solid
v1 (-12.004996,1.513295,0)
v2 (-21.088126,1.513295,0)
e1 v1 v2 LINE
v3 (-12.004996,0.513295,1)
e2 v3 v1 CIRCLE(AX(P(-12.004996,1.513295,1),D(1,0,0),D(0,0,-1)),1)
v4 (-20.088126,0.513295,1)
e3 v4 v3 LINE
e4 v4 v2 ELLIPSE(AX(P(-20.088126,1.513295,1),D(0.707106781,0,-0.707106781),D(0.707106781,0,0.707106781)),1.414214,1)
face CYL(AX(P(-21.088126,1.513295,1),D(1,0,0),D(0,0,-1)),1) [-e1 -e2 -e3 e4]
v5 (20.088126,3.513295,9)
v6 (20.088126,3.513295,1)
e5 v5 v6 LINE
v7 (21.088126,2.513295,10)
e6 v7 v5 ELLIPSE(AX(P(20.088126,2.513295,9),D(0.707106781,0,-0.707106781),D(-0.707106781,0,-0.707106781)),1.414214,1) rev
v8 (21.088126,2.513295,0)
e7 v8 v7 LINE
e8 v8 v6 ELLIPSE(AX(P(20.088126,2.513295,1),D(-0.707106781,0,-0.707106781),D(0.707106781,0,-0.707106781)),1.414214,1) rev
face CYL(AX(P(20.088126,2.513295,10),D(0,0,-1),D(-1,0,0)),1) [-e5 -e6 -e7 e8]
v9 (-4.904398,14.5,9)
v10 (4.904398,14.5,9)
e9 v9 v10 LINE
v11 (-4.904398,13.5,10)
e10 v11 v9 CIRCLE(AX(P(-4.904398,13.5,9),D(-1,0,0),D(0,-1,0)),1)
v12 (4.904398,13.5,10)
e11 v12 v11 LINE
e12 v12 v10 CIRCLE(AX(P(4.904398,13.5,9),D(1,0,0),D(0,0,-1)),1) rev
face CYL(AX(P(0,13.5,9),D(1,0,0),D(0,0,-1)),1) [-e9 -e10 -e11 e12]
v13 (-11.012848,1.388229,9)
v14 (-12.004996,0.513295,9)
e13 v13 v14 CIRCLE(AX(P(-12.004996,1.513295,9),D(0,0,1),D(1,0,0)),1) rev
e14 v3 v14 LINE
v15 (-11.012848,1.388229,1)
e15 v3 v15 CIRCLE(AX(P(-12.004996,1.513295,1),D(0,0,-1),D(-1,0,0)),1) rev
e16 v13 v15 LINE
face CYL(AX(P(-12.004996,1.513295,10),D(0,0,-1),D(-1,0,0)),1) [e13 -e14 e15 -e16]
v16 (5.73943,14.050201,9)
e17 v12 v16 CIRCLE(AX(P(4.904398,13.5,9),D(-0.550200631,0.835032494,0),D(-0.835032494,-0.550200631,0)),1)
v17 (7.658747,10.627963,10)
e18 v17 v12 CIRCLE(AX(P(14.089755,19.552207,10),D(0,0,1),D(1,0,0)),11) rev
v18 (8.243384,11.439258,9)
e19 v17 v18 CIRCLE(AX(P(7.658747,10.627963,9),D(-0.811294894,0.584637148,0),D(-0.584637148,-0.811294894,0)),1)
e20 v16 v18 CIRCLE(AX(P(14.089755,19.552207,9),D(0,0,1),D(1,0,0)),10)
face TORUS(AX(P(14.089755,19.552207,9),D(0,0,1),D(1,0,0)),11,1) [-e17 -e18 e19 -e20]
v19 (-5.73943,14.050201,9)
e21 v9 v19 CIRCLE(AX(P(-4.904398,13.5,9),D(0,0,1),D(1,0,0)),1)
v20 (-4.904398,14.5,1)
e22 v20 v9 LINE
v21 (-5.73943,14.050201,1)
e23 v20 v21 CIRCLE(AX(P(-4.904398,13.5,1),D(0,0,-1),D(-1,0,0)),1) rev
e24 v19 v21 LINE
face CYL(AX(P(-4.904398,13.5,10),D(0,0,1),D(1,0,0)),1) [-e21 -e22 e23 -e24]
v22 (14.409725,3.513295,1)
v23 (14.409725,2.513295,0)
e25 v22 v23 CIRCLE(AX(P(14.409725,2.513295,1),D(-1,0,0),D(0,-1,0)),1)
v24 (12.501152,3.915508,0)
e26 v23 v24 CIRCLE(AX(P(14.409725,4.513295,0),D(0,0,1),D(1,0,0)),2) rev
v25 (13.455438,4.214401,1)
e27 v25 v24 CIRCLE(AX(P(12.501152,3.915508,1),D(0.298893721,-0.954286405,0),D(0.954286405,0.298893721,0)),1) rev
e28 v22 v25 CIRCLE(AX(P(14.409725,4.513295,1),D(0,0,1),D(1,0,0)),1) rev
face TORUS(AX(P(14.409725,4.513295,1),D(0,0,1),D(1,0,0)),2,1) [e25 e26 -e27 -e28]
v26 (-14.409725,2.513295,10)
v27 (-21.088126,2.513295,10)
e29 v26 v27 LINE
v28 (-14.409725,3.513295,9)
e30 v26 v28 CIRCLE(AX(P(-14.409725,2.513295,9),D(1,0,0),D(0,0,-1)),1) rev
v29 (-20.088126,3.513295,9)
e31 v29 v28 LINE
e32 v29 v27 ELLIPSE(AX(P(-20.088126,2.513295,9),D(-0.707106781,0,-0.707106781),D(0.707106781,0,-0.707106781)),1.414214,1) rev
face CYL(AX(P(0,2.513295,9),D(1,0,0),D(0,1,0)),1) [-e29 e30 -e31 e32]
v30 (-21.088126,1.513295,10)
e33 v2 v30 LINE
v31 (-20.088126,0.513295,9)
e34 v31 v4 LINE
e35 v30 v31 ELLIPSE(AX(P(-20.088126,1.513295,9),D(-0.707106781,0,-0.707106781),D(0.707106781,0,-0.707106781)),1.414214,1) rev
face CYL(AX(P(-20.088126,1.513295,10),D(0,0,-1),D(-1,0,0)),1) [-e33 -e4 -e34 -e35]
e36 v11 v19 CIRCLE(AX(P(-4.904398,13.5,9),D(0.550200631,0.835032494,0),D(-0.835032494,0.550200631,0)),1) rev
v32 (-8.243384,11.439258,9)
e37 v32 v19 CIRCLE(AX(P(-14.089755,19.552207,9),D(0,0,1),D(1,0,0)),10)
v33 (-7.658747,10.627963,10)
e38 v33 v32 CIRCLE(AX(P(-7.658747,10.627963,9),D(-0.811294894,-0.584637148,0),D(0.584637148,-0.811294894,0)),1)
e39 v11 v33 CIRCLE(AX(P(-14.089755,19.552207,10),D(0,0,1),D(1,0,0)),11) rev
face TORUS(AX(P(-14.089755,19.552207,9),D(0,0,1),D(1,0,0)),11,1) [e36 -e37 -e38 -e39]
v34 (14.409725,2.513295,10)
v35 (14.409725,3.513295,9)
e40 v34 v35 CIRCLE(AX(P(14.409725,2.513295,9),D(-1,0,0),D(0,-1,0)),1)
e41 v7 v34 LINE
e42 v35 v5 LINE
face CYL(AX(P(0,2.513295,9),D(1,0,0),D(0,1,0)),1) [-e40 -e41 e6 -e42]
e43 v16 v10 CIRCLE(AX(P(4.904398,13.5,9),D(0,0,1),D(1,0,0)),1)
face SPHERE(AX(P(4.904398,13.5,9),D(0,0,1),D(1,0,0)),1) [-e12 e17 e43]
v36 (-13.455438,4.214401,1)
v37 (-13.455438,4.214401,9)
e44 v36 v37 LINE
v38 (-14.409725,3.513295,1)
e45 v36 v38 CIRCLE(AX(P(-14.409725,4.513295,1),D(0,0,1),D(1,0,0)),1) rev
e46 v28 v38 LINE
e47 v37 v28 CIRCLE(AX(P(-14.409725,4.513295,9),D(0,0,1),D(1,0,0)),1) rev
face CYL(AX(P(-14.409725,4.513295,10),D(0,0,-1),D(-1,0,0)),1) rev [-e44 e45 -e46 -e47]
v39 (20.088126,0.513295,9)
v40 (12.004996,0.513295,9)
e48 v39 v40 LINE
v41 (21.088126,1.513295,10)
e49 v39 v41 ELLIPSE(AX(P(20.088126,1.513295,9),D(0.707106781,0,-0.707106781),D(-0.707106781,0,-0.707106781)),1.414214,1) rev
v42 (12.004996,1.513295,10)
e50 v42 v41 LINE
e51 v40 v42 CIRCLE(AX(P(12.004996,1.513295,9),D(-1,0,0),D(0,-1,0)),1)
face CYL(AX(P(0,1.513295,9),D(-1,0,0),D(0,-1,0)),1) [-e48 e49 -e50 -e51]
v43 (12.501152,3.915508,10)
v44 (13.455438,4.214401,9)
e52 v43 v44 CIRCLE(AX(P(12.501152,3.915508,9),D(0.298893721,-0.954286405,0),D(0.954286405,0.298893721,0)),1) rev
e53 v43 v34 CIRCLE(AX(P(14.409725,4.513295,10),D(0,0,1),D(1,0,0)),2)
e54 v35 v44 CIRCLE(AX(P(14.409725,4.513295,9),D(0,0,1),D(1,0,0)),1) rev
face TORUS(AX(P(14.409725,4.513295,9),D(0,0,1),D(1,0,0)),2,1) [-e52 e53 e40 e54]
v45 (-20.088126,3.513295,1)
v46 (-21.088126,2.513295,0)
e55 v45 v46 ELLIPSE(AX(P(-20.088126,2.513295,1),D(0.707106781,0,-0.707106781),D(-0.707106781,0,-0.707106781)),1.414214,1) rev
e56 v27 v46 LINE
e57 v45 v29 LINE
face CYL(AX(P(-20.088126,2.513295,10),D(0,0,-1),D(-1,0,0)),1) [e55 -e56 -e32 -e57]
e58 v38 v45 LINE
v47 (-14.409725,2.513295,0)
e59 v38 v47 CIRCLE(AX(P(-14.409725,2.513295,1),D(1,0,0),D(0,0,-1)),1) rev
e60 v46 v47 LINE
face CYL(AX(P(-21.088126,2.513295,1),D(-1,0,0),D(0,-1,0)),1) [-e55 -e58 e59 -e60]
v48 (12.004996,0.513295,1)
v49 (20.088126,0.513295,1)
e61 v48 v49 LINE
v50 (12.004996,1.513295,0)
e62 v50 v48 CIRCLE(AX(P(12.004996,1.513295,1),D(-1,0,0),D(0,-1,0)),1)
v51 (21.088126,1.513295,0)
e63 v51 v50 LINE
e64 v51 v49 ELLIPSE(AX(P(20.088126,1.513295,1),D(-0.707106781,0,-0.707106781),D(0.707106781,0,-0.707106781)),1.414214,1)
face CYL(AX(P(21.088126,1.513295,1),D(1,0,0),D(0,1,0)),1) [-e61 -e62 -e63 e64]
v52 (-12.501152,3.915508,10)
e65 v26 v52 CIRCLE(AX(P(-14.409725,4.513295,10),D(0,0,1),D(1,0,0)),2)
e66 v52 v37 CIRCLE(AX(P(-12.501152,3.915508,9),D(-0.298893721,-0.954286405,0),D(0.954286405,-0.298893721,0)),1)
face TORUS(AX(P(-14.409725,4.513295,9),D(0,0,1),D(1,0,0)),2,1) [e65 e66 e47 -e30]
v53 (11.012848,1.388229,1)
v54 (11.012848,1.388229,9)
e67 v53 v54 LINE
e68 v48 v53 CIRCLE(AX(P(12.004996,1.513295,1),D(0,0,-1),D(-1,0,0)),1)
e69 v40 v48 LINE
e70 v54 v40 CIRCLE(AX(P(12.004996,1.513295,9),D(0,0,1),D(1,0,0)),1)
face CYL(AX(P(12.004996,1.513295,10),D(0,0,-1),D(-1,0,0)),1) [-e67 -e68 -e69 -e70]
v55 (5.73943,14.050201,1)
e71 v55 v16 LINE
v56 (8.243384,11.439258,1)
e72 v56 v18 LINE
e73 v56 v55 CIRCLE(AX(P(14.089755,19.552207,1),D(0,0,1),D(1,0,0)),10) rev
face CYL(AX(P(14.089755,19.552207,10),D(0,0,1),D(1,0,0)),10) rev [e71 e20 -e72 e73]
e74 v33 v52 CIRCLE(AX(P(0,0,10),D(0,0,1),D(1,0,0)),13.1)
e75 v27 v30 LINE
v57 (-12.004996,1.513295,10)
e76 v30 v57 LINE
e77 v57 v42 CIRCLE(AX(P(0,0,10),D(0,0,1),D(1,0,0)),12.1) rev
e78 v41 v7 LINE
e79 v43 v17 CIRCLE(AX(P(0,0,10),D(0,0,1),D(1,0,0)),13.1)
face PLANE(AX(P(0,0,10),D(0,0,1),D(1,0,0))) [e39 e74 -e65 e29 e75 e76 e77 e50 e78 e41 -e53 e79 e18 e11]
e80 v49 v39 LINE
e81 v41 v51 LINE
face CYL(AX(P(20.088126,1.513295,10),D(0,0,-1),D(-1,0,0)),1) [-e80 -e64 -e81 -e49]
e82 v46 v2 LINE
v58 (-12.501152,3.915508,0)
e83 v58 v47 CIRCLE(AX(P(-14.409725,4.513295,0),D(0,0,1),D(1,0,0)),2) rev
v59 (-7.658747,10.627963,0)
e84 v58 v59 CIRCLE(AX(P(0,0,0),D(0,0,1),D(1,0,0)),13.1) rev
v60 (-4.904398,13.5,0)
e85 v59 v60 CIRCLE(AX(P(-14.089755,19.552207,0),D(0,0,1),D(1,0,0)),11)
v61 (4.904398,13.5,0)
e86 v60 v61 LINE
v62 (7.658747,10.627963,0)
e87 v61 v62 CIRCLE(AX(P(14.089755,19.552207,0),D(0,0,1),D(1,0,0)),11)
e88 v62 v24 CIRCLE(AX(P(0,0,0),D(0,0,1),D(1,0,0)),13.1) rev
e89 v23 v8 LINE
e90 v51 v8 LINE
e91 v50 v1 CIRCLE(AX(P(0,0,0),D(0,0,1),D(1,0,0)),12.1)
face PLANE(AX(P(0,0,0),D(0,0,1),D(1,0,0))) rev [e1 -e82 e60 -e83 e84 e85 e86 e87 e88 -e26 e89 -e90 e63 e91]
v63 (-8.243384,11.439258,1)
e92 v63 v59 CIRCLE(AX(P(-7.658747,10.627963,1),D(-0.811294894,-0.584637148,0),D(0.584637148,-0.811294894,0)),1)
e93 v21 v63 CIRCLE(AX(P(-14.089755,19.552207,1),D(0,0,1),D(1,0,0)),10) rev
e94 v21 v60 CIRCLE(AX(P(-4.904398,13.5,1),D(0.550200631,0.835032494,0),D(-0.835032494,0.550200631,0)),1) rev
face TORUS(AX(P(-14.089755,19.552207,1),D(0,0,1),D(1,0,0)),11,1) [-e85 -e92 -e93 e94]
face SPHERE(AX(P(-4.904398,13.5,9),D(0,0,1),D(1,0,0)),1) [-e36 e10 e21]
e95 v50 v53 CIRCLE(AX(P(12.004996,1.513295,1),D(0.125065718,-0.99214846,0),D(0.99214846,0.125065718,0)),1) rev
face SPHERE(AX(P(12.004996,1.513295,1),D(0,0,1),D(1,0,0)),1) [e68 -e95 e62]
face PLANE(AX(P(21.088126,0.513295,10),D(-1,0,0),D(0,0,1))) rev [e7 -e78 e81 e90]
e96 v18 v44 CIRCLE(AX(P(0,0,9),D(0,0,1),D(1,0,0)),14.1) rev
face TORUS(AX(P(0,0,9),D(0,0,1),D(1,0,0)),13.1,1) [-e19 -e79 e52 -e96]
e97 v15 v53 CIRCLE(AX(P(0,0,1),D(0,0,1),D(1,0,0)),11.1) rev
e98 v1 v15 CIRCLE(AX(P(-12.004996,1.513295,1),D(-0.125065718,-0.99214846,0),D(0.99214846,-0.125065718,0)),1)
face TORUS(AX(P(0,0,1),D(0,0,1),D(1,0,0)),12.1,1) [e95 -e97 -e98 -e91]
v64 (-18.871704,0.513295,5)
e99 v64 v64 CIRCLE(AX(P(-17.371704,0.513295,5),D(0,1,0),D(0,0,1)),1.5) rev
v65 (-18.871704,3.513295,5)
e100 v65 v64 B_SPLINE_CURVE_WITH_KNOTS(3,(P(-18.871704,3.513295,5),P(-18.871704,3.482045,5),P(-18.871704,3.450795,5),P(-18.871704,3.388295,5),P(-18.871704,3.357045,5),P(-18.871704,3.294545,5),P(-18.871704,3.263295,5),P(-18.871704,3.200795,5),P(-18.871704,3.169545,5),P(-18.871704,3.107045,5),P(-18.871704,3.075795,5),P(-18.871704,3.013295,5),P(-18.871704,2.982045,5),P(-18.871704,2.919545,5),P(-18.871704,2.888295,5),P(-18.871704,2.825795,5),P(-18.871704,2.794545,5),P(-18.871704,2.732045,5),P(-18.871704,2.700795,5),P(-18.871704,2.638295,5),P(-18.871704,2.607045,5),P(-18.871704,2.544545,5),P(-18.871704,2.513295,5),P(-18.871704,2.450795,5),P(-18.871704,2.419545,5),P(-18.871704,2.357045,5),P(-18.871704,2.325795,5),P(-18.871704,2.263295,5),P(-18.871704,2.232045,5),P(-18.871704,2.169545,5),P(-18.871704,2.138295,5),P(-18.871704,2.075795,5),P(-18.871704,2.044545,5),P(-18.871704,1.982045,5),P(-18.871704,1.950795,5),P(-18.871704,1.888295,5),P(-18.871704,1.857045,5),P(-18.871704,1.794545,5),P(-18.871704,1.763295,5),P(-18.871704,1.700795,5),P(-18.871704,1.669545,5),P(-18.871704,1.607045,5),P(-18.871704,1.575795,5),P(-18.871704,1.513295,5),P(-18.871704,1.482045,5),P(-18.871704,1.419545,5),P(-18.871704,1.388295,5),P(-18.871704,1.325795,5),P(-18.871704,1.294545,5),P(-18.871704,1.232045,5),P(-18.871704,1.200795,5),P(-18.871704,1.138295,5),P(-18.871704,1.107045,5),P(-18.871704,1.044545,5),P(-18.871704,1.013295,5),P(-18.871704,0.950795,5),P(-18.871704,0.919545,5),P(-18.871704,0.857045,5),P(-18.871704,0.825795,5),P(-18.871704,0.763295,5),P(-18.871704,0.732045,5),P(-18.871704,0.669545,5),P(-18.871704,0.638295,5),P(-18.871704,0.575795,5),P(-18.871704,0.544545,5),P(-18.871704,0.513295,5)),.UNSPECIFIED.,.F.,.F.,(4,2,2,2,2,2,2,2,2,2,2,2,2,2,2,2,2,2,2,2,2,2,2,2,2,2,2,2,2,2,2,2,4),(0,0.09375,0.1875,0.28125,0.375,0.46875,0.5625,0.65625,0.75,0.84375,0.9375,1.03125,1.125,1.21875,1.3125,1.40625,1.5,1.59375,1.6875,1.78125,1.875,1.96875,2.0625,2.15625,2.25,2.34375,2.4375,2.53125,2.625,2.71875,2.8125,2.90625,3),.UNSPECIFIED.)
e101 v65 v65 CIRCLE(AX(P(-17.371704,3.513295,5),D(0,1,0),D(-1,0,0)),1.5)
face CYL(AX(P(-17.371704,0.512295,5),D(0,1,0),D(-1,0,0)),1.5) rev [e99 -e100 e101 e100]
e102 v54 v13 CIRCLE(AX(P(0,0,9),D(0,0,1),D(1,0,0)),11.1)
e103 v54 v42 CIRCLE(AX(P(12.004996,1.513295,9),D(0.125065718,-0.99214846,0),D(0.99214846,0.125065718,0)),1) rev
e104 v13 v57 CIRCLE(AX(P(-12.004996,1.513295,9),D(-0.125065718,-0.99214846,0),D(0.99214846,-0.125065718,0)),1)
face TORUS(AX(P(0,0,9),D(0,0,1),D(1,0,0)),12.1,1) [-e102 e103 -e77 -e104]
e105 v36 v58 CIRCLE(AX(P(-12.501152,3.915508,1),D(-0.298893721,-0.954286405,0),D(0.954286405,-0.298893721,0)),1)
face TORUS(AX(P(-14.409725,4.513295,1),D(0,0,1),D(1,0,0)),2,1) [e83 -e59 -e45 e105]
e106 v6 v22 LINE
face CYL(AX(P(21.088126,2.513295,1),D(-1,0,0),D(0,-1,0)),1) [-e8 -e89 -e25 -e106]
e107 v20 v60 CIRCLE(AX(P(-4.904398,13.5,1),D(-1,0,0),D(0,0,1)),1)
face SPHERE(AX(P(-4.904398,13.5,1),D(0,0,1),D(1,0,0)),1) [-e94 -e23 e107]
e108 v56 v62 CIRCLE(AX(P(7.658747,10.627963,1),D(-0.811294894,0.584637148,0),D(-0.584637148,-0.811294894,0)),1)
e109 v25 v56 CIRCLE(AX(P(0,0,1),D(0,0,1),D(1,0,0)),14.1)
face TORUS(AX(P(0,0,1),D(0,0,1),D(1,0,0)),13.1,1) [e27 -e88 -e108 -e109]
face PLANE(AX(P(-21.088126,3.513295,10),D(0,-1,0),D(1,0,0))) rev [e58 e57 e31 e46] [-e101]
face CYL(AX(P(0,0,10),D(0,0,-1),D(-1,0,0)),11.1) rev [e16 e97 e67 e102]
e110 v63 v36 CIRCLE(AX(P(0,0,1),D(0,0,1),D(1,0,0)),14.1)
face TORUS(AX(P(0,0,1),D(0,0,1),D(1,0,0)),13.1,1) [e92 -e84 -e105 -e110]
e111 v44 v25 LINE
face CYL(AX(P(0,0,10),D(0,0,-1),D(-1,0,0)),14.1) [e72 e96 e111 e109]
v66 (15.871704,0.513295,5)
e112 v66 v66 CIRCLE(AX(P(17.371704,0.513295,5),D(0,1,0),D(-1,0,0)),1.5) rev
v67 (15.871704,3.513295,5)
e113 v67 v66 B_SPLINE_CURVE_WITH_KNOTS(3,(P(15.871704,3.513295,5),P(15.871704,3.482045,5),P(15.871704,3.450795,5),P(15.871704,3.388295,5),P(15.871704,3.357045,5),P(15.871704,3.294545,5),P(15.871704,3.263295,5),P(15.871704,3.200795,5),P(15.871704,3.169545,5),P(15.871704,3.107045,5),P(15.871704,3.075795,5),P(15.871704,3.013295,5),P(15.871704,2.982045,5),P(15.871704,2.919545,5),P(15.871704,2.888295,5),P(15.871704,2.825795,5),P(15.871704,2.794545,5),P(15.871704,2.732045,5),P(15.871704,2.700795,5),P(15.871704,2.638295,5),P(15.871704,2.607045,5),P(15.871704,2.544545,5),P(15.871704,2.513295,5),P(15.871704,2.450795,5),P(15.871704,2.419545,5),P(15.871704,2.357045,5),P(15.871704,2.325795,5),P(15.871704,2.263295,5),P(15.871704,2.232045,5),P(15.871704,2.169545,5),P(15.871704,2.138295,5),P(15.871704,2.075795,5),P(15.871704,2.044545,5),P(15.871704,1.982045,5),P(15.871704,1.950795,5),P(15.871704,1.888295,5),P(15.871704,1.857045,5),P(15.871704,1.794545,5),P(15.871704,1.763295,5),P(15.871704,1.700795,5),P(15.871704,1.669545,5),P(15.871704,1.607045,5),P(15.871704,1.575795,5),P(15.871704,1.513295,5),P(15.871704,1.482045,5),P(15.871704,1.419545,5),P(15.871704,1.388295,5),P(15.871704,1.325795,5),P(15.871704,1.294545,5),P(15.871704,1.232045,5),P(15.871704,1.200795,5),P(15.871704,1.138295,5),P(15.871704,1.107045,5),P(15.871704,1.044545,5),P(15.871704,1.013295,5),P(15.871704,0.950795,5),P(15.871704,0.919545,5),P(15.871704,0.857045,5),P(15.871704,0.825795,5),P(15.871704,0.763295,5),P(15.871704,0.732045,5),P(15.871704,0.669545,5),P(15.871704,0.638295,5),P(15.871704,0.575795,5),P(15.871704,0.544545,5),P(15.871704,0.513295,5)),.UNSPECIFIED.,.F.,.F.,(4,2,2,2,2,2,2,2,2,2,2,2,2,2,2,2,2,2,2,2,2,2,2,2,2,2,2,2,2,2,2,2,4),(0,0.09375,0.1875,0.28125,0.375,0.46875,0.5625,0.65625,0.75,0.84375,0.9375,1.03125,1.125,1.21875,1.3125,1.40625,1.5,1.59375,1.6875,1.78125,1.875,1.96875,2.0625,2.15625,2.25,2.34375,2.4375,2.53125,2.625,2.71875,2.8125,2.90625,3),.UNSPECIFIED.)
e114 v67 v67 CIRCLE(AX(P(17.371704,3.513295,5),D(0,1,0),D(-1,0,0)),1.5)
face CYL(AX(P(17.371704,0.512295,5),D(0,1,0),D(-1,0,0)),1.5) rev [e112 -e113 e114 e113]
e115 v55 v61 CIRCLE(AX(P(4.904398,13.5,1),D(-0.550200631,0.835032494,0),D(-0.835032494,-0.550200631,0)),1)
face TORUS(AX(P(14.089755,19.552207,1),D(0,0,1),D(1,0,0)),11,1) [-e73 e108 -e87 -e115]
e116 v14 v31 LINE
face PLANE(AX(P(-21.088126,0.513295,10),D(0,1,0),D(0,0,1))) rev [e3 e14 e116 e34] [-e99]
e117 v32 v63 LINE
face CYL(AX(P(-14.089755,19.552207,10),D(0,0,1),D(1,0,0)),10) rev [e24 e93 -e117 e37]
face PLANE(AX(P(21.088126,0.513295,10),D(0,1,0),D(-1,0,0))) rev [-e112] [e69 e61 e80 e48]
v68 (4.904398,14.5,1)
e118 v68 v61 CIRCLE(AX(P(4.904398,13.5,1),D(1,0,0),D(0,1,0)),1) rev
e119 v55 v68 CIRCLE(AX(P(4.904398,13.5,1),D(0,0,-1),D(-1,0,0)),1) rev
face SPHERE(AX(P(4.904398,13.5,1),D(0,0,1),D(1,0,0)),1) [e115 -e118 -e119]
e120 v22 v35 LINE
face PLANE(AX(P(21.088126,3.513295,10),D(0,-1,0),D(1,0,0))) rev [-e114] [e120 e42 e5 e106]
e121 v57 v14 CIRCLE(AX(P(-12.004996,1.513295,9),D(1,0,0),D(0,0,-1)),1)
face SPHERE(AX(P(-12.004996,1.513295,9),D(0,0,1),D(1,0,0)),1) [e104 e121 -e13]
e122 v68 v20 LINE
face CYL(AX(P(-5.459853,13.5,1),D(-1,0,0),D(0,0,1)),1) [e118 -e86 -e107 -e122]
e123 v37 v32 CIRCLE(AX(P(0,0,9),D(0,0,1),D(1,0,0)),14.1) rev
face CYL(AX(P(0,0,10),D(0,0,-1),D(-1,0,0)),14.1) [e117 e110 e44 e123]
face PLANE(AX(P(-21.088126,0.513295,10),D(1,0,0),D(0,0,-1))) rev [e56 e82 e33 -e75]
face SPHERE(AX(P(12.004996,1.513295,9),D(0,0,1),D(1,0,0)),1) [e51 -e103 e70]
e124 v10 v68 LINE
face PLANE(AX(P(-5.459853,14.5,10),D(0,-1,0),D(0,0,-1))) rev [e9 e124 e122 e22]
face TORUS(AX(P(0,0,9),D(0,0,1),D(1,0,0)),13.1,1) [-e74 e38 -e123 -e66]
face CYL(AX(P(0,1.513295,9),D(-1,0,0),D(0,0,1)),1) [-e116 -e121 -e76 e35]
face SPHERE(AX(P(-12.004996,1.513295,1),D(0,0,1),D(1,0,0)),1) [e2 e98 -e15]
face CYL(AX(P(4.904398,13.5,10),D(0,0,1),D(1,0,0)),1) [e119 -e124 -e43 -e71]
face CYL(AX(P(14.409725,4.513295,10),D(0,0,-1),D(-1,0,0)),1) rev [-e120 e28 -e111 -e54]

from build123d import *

# Parameters (mm, degrees)
BOSS_EXTRUDE1_DEPTH = 10
CUT_EXTRUDE1_REACH  = 27.796
SKETCH2_R           = 1.5
FILLET1_R           = 10
FILLET2_R           = 1


with BuildPart() as part:
    # Sketch1 → Boss-Extrude1 (new body)
    with BuildSketch(Plane.XY):
        with BuildLine():
            Line((-5.459853478, 13), (-5.459853478, 14.5))
            Line((-5.459853478, 14.5), (5.459853478, 14.5))
            Line((5.459853478, 14.5), (5.459853478, 13))
            ThreePointArc((5.459853478, 13), (10.669887711, 9.21756455), (13.655283113, 3.513295191))
            Line((13.655283113, 3.513295191), (21.088125543, 3.513295191))
            Line((21.088125543, 3.513295191), (21.088125543, 0.513295191))
            Line((21.088125543, 0.513295191), (11.088125543, 0.513295191))
            ThreePointArc((11.088125543, 0.513295191), (0, 11.1), (-11.088125543, 0.513295191))
            Line((-11.088125543, 0.513295191), (-21.088125543, 0.513295191))
            Line((-21.088125543, 0.513295191), (-21.088125543, 3.513295191))
            Line((-21.088125543, 3.513295191), (-13.655283113, 3.513295191))
            ThreePointArc((-13.655283113, 3.513295191), (-10.669887711, 9.21756455), (-5.459853478, 13))
        make_face()
    extrude(amount=BOSS_EXTRUDE1_DEPTH)

    # Sketch2 → Cut-Extrude1 (cut, up to next)
    with BuildSketch(Plane(origin=(0, 3.513295191, 0), x_dir=(1, 0, 0), z_dir=(0, 1, 0)), mode=Mode.PRIVATE) as cut_extrude1_sk1:
        with Locations(Location((-17.371704328, -5, 0), (0, 0, 180))):
            Circle(SKETCH2_R)
    cut_extrude1_tool1 = extrude(cut_extrude1_sk1.sketch, amount=-CUT_EXTRUDE1_REACH, mode=Mode.PRIVATE) & part.part
    # Sketch2 → Cut-Extrude1 (cut, up to next)
    with BuildSketch(Plane(origin=(0, 3.513295191, 0), x_dir=(1, 0, 0), z_dir=(0, 1, 0)), mode=Mode.PRIVATE) as cut_extrude1_sk2:
        with Locations(Location((17.371704328, -5, 0), (0, 0, 180))):
            Circle(SKETCH2_R)
    cut_extrude1_tool2 = extrude(cut_extrude1_sk2.sketch, amount=-CUT_EXTRUDE1_REACH, mode=Mode.PRIVATE) & part.part
    add(cut_extrude1_tool1.solids().sort_by_distance((-17.371704, 3.513295, 5))[0], mode=Mode.SUBTRACT)
    add(cut_extrude1_tool2.solids().sort_by_distance((17.371704, 3.513295, 5))[0], mode=Mode.SUBTRACT)

    # Fillet1
    # the kernel refuses this fillet: 10 mm, written as the material it adds along each edge
    with BuildSketch(Plane(origin=(5.459853478, 13, 0), x_dir=(0, 1, 0), z_dir=(0, 0, 1))) as fillet1_piece_1:
        with BuildLine():
            CenterArc((6.552206942, -8.629901796), FILLET1_R, 120.346003633, 23.876636028)
            Line((-1.560741996, -2.783530313), (-1.723000975, -2.666602883))
            ThreePointArc((-1.723000975, -2.666602883), (-0.875816916, -1.338248063), (-0.184397163, 0.07744473))
            Line((-0.184397163, 0.07744473), (0, 0.2))
            ThreePointArc((0, 0.2), (0.75, 0.2), (1.398955861, 0.172598036))
            Line((1.398955861, 0.172598036), (1.5, 0))
        make_face()
    extrude(amount=10)
    with BuildSketch(Plane(origin=(-5.459853478, 13, 0), x_dir=(-0.8722433873059962, -0.4890720532814792, 0), z_dir=(0, 0, 1))) as fillet1_piece_2:
        with BuildLine():
            CenterArc((4.322873472, -9.935762969), FILLET1_R, 96.497751777, 23.876636028)
            Line((-0.73360808, -1.308365081), (-0.834737711, -1.135817123))
            ThreePointArc((-0.834737711, -1.135817123), (-0.541252717, -0.55636813), (-0.174448677, 0.097814411))
            Line((-0.174448677, 0.097814411), (0.022632845, 0.198715259))
            ThreePointArc((0.022632845, 0.198715259), (1.595615601, 0.109425786), (3.168598356, 0.198715259))
            Line((3.168598356, 0.198715259), (3.191231202, 0))
        make_face()
    extrude(amount=10)

    # Fillet2
    fillet2_edges = [part.edges().sort_by_distance(p)[0] for p in [
        (16.088125543, 0.513295191, 0),
        (0, 11.1, 0),
        (11.644446087, 7.950904057, 10),
        (-16.088125543, 0.513295191, 0),
        (-17.371704328, 3.513295191, 0),
        (0, 14.5, 0),
        (11.644446087, 7.950904057, 0),
        (17.371704328, 3.513295191, 0),
        (21.088125543, 0.513295191, 5),
        (11.088125543, 0.513295191, 5),
        (-11.088125543, 0.513295191, 5),
        (0, 14.5, 10),
        (-21.088125543, 0.513295191, 5),
        (-21.088125543, 3.513295191, 5),
        (-13.655283113, 3.513295191, 5),
        (-5.459853478, 14.5, 5),
        (5.459853478, 14.5, 5),
        (13.655283113, 3.513295191, 5),
        (21.088125543, 3.513295191, 5),
        (-17.371704328, 3.513295191, 10),
        (-16.088125543, 0.513295191, 10),
        (-11.644446087, 7.950904057, 0),
        (-11.644446087, 7.950904057, 10),
        (0, 11.1, 10),
        (6.691602977, 12.824105977, 0),
        (6.691602977, 12.824105977, 10),
        (-6.691602977, 12.824105977, 0),
        (-6.691602977, 12.824105977, 10),
        (16.088125543, 0.513295191, 10),
        (17.371704328, 3.513295191, 10),
    ]]
    fillet(fillet2_edges, radius=FILLET2_R)


solid = part.part
